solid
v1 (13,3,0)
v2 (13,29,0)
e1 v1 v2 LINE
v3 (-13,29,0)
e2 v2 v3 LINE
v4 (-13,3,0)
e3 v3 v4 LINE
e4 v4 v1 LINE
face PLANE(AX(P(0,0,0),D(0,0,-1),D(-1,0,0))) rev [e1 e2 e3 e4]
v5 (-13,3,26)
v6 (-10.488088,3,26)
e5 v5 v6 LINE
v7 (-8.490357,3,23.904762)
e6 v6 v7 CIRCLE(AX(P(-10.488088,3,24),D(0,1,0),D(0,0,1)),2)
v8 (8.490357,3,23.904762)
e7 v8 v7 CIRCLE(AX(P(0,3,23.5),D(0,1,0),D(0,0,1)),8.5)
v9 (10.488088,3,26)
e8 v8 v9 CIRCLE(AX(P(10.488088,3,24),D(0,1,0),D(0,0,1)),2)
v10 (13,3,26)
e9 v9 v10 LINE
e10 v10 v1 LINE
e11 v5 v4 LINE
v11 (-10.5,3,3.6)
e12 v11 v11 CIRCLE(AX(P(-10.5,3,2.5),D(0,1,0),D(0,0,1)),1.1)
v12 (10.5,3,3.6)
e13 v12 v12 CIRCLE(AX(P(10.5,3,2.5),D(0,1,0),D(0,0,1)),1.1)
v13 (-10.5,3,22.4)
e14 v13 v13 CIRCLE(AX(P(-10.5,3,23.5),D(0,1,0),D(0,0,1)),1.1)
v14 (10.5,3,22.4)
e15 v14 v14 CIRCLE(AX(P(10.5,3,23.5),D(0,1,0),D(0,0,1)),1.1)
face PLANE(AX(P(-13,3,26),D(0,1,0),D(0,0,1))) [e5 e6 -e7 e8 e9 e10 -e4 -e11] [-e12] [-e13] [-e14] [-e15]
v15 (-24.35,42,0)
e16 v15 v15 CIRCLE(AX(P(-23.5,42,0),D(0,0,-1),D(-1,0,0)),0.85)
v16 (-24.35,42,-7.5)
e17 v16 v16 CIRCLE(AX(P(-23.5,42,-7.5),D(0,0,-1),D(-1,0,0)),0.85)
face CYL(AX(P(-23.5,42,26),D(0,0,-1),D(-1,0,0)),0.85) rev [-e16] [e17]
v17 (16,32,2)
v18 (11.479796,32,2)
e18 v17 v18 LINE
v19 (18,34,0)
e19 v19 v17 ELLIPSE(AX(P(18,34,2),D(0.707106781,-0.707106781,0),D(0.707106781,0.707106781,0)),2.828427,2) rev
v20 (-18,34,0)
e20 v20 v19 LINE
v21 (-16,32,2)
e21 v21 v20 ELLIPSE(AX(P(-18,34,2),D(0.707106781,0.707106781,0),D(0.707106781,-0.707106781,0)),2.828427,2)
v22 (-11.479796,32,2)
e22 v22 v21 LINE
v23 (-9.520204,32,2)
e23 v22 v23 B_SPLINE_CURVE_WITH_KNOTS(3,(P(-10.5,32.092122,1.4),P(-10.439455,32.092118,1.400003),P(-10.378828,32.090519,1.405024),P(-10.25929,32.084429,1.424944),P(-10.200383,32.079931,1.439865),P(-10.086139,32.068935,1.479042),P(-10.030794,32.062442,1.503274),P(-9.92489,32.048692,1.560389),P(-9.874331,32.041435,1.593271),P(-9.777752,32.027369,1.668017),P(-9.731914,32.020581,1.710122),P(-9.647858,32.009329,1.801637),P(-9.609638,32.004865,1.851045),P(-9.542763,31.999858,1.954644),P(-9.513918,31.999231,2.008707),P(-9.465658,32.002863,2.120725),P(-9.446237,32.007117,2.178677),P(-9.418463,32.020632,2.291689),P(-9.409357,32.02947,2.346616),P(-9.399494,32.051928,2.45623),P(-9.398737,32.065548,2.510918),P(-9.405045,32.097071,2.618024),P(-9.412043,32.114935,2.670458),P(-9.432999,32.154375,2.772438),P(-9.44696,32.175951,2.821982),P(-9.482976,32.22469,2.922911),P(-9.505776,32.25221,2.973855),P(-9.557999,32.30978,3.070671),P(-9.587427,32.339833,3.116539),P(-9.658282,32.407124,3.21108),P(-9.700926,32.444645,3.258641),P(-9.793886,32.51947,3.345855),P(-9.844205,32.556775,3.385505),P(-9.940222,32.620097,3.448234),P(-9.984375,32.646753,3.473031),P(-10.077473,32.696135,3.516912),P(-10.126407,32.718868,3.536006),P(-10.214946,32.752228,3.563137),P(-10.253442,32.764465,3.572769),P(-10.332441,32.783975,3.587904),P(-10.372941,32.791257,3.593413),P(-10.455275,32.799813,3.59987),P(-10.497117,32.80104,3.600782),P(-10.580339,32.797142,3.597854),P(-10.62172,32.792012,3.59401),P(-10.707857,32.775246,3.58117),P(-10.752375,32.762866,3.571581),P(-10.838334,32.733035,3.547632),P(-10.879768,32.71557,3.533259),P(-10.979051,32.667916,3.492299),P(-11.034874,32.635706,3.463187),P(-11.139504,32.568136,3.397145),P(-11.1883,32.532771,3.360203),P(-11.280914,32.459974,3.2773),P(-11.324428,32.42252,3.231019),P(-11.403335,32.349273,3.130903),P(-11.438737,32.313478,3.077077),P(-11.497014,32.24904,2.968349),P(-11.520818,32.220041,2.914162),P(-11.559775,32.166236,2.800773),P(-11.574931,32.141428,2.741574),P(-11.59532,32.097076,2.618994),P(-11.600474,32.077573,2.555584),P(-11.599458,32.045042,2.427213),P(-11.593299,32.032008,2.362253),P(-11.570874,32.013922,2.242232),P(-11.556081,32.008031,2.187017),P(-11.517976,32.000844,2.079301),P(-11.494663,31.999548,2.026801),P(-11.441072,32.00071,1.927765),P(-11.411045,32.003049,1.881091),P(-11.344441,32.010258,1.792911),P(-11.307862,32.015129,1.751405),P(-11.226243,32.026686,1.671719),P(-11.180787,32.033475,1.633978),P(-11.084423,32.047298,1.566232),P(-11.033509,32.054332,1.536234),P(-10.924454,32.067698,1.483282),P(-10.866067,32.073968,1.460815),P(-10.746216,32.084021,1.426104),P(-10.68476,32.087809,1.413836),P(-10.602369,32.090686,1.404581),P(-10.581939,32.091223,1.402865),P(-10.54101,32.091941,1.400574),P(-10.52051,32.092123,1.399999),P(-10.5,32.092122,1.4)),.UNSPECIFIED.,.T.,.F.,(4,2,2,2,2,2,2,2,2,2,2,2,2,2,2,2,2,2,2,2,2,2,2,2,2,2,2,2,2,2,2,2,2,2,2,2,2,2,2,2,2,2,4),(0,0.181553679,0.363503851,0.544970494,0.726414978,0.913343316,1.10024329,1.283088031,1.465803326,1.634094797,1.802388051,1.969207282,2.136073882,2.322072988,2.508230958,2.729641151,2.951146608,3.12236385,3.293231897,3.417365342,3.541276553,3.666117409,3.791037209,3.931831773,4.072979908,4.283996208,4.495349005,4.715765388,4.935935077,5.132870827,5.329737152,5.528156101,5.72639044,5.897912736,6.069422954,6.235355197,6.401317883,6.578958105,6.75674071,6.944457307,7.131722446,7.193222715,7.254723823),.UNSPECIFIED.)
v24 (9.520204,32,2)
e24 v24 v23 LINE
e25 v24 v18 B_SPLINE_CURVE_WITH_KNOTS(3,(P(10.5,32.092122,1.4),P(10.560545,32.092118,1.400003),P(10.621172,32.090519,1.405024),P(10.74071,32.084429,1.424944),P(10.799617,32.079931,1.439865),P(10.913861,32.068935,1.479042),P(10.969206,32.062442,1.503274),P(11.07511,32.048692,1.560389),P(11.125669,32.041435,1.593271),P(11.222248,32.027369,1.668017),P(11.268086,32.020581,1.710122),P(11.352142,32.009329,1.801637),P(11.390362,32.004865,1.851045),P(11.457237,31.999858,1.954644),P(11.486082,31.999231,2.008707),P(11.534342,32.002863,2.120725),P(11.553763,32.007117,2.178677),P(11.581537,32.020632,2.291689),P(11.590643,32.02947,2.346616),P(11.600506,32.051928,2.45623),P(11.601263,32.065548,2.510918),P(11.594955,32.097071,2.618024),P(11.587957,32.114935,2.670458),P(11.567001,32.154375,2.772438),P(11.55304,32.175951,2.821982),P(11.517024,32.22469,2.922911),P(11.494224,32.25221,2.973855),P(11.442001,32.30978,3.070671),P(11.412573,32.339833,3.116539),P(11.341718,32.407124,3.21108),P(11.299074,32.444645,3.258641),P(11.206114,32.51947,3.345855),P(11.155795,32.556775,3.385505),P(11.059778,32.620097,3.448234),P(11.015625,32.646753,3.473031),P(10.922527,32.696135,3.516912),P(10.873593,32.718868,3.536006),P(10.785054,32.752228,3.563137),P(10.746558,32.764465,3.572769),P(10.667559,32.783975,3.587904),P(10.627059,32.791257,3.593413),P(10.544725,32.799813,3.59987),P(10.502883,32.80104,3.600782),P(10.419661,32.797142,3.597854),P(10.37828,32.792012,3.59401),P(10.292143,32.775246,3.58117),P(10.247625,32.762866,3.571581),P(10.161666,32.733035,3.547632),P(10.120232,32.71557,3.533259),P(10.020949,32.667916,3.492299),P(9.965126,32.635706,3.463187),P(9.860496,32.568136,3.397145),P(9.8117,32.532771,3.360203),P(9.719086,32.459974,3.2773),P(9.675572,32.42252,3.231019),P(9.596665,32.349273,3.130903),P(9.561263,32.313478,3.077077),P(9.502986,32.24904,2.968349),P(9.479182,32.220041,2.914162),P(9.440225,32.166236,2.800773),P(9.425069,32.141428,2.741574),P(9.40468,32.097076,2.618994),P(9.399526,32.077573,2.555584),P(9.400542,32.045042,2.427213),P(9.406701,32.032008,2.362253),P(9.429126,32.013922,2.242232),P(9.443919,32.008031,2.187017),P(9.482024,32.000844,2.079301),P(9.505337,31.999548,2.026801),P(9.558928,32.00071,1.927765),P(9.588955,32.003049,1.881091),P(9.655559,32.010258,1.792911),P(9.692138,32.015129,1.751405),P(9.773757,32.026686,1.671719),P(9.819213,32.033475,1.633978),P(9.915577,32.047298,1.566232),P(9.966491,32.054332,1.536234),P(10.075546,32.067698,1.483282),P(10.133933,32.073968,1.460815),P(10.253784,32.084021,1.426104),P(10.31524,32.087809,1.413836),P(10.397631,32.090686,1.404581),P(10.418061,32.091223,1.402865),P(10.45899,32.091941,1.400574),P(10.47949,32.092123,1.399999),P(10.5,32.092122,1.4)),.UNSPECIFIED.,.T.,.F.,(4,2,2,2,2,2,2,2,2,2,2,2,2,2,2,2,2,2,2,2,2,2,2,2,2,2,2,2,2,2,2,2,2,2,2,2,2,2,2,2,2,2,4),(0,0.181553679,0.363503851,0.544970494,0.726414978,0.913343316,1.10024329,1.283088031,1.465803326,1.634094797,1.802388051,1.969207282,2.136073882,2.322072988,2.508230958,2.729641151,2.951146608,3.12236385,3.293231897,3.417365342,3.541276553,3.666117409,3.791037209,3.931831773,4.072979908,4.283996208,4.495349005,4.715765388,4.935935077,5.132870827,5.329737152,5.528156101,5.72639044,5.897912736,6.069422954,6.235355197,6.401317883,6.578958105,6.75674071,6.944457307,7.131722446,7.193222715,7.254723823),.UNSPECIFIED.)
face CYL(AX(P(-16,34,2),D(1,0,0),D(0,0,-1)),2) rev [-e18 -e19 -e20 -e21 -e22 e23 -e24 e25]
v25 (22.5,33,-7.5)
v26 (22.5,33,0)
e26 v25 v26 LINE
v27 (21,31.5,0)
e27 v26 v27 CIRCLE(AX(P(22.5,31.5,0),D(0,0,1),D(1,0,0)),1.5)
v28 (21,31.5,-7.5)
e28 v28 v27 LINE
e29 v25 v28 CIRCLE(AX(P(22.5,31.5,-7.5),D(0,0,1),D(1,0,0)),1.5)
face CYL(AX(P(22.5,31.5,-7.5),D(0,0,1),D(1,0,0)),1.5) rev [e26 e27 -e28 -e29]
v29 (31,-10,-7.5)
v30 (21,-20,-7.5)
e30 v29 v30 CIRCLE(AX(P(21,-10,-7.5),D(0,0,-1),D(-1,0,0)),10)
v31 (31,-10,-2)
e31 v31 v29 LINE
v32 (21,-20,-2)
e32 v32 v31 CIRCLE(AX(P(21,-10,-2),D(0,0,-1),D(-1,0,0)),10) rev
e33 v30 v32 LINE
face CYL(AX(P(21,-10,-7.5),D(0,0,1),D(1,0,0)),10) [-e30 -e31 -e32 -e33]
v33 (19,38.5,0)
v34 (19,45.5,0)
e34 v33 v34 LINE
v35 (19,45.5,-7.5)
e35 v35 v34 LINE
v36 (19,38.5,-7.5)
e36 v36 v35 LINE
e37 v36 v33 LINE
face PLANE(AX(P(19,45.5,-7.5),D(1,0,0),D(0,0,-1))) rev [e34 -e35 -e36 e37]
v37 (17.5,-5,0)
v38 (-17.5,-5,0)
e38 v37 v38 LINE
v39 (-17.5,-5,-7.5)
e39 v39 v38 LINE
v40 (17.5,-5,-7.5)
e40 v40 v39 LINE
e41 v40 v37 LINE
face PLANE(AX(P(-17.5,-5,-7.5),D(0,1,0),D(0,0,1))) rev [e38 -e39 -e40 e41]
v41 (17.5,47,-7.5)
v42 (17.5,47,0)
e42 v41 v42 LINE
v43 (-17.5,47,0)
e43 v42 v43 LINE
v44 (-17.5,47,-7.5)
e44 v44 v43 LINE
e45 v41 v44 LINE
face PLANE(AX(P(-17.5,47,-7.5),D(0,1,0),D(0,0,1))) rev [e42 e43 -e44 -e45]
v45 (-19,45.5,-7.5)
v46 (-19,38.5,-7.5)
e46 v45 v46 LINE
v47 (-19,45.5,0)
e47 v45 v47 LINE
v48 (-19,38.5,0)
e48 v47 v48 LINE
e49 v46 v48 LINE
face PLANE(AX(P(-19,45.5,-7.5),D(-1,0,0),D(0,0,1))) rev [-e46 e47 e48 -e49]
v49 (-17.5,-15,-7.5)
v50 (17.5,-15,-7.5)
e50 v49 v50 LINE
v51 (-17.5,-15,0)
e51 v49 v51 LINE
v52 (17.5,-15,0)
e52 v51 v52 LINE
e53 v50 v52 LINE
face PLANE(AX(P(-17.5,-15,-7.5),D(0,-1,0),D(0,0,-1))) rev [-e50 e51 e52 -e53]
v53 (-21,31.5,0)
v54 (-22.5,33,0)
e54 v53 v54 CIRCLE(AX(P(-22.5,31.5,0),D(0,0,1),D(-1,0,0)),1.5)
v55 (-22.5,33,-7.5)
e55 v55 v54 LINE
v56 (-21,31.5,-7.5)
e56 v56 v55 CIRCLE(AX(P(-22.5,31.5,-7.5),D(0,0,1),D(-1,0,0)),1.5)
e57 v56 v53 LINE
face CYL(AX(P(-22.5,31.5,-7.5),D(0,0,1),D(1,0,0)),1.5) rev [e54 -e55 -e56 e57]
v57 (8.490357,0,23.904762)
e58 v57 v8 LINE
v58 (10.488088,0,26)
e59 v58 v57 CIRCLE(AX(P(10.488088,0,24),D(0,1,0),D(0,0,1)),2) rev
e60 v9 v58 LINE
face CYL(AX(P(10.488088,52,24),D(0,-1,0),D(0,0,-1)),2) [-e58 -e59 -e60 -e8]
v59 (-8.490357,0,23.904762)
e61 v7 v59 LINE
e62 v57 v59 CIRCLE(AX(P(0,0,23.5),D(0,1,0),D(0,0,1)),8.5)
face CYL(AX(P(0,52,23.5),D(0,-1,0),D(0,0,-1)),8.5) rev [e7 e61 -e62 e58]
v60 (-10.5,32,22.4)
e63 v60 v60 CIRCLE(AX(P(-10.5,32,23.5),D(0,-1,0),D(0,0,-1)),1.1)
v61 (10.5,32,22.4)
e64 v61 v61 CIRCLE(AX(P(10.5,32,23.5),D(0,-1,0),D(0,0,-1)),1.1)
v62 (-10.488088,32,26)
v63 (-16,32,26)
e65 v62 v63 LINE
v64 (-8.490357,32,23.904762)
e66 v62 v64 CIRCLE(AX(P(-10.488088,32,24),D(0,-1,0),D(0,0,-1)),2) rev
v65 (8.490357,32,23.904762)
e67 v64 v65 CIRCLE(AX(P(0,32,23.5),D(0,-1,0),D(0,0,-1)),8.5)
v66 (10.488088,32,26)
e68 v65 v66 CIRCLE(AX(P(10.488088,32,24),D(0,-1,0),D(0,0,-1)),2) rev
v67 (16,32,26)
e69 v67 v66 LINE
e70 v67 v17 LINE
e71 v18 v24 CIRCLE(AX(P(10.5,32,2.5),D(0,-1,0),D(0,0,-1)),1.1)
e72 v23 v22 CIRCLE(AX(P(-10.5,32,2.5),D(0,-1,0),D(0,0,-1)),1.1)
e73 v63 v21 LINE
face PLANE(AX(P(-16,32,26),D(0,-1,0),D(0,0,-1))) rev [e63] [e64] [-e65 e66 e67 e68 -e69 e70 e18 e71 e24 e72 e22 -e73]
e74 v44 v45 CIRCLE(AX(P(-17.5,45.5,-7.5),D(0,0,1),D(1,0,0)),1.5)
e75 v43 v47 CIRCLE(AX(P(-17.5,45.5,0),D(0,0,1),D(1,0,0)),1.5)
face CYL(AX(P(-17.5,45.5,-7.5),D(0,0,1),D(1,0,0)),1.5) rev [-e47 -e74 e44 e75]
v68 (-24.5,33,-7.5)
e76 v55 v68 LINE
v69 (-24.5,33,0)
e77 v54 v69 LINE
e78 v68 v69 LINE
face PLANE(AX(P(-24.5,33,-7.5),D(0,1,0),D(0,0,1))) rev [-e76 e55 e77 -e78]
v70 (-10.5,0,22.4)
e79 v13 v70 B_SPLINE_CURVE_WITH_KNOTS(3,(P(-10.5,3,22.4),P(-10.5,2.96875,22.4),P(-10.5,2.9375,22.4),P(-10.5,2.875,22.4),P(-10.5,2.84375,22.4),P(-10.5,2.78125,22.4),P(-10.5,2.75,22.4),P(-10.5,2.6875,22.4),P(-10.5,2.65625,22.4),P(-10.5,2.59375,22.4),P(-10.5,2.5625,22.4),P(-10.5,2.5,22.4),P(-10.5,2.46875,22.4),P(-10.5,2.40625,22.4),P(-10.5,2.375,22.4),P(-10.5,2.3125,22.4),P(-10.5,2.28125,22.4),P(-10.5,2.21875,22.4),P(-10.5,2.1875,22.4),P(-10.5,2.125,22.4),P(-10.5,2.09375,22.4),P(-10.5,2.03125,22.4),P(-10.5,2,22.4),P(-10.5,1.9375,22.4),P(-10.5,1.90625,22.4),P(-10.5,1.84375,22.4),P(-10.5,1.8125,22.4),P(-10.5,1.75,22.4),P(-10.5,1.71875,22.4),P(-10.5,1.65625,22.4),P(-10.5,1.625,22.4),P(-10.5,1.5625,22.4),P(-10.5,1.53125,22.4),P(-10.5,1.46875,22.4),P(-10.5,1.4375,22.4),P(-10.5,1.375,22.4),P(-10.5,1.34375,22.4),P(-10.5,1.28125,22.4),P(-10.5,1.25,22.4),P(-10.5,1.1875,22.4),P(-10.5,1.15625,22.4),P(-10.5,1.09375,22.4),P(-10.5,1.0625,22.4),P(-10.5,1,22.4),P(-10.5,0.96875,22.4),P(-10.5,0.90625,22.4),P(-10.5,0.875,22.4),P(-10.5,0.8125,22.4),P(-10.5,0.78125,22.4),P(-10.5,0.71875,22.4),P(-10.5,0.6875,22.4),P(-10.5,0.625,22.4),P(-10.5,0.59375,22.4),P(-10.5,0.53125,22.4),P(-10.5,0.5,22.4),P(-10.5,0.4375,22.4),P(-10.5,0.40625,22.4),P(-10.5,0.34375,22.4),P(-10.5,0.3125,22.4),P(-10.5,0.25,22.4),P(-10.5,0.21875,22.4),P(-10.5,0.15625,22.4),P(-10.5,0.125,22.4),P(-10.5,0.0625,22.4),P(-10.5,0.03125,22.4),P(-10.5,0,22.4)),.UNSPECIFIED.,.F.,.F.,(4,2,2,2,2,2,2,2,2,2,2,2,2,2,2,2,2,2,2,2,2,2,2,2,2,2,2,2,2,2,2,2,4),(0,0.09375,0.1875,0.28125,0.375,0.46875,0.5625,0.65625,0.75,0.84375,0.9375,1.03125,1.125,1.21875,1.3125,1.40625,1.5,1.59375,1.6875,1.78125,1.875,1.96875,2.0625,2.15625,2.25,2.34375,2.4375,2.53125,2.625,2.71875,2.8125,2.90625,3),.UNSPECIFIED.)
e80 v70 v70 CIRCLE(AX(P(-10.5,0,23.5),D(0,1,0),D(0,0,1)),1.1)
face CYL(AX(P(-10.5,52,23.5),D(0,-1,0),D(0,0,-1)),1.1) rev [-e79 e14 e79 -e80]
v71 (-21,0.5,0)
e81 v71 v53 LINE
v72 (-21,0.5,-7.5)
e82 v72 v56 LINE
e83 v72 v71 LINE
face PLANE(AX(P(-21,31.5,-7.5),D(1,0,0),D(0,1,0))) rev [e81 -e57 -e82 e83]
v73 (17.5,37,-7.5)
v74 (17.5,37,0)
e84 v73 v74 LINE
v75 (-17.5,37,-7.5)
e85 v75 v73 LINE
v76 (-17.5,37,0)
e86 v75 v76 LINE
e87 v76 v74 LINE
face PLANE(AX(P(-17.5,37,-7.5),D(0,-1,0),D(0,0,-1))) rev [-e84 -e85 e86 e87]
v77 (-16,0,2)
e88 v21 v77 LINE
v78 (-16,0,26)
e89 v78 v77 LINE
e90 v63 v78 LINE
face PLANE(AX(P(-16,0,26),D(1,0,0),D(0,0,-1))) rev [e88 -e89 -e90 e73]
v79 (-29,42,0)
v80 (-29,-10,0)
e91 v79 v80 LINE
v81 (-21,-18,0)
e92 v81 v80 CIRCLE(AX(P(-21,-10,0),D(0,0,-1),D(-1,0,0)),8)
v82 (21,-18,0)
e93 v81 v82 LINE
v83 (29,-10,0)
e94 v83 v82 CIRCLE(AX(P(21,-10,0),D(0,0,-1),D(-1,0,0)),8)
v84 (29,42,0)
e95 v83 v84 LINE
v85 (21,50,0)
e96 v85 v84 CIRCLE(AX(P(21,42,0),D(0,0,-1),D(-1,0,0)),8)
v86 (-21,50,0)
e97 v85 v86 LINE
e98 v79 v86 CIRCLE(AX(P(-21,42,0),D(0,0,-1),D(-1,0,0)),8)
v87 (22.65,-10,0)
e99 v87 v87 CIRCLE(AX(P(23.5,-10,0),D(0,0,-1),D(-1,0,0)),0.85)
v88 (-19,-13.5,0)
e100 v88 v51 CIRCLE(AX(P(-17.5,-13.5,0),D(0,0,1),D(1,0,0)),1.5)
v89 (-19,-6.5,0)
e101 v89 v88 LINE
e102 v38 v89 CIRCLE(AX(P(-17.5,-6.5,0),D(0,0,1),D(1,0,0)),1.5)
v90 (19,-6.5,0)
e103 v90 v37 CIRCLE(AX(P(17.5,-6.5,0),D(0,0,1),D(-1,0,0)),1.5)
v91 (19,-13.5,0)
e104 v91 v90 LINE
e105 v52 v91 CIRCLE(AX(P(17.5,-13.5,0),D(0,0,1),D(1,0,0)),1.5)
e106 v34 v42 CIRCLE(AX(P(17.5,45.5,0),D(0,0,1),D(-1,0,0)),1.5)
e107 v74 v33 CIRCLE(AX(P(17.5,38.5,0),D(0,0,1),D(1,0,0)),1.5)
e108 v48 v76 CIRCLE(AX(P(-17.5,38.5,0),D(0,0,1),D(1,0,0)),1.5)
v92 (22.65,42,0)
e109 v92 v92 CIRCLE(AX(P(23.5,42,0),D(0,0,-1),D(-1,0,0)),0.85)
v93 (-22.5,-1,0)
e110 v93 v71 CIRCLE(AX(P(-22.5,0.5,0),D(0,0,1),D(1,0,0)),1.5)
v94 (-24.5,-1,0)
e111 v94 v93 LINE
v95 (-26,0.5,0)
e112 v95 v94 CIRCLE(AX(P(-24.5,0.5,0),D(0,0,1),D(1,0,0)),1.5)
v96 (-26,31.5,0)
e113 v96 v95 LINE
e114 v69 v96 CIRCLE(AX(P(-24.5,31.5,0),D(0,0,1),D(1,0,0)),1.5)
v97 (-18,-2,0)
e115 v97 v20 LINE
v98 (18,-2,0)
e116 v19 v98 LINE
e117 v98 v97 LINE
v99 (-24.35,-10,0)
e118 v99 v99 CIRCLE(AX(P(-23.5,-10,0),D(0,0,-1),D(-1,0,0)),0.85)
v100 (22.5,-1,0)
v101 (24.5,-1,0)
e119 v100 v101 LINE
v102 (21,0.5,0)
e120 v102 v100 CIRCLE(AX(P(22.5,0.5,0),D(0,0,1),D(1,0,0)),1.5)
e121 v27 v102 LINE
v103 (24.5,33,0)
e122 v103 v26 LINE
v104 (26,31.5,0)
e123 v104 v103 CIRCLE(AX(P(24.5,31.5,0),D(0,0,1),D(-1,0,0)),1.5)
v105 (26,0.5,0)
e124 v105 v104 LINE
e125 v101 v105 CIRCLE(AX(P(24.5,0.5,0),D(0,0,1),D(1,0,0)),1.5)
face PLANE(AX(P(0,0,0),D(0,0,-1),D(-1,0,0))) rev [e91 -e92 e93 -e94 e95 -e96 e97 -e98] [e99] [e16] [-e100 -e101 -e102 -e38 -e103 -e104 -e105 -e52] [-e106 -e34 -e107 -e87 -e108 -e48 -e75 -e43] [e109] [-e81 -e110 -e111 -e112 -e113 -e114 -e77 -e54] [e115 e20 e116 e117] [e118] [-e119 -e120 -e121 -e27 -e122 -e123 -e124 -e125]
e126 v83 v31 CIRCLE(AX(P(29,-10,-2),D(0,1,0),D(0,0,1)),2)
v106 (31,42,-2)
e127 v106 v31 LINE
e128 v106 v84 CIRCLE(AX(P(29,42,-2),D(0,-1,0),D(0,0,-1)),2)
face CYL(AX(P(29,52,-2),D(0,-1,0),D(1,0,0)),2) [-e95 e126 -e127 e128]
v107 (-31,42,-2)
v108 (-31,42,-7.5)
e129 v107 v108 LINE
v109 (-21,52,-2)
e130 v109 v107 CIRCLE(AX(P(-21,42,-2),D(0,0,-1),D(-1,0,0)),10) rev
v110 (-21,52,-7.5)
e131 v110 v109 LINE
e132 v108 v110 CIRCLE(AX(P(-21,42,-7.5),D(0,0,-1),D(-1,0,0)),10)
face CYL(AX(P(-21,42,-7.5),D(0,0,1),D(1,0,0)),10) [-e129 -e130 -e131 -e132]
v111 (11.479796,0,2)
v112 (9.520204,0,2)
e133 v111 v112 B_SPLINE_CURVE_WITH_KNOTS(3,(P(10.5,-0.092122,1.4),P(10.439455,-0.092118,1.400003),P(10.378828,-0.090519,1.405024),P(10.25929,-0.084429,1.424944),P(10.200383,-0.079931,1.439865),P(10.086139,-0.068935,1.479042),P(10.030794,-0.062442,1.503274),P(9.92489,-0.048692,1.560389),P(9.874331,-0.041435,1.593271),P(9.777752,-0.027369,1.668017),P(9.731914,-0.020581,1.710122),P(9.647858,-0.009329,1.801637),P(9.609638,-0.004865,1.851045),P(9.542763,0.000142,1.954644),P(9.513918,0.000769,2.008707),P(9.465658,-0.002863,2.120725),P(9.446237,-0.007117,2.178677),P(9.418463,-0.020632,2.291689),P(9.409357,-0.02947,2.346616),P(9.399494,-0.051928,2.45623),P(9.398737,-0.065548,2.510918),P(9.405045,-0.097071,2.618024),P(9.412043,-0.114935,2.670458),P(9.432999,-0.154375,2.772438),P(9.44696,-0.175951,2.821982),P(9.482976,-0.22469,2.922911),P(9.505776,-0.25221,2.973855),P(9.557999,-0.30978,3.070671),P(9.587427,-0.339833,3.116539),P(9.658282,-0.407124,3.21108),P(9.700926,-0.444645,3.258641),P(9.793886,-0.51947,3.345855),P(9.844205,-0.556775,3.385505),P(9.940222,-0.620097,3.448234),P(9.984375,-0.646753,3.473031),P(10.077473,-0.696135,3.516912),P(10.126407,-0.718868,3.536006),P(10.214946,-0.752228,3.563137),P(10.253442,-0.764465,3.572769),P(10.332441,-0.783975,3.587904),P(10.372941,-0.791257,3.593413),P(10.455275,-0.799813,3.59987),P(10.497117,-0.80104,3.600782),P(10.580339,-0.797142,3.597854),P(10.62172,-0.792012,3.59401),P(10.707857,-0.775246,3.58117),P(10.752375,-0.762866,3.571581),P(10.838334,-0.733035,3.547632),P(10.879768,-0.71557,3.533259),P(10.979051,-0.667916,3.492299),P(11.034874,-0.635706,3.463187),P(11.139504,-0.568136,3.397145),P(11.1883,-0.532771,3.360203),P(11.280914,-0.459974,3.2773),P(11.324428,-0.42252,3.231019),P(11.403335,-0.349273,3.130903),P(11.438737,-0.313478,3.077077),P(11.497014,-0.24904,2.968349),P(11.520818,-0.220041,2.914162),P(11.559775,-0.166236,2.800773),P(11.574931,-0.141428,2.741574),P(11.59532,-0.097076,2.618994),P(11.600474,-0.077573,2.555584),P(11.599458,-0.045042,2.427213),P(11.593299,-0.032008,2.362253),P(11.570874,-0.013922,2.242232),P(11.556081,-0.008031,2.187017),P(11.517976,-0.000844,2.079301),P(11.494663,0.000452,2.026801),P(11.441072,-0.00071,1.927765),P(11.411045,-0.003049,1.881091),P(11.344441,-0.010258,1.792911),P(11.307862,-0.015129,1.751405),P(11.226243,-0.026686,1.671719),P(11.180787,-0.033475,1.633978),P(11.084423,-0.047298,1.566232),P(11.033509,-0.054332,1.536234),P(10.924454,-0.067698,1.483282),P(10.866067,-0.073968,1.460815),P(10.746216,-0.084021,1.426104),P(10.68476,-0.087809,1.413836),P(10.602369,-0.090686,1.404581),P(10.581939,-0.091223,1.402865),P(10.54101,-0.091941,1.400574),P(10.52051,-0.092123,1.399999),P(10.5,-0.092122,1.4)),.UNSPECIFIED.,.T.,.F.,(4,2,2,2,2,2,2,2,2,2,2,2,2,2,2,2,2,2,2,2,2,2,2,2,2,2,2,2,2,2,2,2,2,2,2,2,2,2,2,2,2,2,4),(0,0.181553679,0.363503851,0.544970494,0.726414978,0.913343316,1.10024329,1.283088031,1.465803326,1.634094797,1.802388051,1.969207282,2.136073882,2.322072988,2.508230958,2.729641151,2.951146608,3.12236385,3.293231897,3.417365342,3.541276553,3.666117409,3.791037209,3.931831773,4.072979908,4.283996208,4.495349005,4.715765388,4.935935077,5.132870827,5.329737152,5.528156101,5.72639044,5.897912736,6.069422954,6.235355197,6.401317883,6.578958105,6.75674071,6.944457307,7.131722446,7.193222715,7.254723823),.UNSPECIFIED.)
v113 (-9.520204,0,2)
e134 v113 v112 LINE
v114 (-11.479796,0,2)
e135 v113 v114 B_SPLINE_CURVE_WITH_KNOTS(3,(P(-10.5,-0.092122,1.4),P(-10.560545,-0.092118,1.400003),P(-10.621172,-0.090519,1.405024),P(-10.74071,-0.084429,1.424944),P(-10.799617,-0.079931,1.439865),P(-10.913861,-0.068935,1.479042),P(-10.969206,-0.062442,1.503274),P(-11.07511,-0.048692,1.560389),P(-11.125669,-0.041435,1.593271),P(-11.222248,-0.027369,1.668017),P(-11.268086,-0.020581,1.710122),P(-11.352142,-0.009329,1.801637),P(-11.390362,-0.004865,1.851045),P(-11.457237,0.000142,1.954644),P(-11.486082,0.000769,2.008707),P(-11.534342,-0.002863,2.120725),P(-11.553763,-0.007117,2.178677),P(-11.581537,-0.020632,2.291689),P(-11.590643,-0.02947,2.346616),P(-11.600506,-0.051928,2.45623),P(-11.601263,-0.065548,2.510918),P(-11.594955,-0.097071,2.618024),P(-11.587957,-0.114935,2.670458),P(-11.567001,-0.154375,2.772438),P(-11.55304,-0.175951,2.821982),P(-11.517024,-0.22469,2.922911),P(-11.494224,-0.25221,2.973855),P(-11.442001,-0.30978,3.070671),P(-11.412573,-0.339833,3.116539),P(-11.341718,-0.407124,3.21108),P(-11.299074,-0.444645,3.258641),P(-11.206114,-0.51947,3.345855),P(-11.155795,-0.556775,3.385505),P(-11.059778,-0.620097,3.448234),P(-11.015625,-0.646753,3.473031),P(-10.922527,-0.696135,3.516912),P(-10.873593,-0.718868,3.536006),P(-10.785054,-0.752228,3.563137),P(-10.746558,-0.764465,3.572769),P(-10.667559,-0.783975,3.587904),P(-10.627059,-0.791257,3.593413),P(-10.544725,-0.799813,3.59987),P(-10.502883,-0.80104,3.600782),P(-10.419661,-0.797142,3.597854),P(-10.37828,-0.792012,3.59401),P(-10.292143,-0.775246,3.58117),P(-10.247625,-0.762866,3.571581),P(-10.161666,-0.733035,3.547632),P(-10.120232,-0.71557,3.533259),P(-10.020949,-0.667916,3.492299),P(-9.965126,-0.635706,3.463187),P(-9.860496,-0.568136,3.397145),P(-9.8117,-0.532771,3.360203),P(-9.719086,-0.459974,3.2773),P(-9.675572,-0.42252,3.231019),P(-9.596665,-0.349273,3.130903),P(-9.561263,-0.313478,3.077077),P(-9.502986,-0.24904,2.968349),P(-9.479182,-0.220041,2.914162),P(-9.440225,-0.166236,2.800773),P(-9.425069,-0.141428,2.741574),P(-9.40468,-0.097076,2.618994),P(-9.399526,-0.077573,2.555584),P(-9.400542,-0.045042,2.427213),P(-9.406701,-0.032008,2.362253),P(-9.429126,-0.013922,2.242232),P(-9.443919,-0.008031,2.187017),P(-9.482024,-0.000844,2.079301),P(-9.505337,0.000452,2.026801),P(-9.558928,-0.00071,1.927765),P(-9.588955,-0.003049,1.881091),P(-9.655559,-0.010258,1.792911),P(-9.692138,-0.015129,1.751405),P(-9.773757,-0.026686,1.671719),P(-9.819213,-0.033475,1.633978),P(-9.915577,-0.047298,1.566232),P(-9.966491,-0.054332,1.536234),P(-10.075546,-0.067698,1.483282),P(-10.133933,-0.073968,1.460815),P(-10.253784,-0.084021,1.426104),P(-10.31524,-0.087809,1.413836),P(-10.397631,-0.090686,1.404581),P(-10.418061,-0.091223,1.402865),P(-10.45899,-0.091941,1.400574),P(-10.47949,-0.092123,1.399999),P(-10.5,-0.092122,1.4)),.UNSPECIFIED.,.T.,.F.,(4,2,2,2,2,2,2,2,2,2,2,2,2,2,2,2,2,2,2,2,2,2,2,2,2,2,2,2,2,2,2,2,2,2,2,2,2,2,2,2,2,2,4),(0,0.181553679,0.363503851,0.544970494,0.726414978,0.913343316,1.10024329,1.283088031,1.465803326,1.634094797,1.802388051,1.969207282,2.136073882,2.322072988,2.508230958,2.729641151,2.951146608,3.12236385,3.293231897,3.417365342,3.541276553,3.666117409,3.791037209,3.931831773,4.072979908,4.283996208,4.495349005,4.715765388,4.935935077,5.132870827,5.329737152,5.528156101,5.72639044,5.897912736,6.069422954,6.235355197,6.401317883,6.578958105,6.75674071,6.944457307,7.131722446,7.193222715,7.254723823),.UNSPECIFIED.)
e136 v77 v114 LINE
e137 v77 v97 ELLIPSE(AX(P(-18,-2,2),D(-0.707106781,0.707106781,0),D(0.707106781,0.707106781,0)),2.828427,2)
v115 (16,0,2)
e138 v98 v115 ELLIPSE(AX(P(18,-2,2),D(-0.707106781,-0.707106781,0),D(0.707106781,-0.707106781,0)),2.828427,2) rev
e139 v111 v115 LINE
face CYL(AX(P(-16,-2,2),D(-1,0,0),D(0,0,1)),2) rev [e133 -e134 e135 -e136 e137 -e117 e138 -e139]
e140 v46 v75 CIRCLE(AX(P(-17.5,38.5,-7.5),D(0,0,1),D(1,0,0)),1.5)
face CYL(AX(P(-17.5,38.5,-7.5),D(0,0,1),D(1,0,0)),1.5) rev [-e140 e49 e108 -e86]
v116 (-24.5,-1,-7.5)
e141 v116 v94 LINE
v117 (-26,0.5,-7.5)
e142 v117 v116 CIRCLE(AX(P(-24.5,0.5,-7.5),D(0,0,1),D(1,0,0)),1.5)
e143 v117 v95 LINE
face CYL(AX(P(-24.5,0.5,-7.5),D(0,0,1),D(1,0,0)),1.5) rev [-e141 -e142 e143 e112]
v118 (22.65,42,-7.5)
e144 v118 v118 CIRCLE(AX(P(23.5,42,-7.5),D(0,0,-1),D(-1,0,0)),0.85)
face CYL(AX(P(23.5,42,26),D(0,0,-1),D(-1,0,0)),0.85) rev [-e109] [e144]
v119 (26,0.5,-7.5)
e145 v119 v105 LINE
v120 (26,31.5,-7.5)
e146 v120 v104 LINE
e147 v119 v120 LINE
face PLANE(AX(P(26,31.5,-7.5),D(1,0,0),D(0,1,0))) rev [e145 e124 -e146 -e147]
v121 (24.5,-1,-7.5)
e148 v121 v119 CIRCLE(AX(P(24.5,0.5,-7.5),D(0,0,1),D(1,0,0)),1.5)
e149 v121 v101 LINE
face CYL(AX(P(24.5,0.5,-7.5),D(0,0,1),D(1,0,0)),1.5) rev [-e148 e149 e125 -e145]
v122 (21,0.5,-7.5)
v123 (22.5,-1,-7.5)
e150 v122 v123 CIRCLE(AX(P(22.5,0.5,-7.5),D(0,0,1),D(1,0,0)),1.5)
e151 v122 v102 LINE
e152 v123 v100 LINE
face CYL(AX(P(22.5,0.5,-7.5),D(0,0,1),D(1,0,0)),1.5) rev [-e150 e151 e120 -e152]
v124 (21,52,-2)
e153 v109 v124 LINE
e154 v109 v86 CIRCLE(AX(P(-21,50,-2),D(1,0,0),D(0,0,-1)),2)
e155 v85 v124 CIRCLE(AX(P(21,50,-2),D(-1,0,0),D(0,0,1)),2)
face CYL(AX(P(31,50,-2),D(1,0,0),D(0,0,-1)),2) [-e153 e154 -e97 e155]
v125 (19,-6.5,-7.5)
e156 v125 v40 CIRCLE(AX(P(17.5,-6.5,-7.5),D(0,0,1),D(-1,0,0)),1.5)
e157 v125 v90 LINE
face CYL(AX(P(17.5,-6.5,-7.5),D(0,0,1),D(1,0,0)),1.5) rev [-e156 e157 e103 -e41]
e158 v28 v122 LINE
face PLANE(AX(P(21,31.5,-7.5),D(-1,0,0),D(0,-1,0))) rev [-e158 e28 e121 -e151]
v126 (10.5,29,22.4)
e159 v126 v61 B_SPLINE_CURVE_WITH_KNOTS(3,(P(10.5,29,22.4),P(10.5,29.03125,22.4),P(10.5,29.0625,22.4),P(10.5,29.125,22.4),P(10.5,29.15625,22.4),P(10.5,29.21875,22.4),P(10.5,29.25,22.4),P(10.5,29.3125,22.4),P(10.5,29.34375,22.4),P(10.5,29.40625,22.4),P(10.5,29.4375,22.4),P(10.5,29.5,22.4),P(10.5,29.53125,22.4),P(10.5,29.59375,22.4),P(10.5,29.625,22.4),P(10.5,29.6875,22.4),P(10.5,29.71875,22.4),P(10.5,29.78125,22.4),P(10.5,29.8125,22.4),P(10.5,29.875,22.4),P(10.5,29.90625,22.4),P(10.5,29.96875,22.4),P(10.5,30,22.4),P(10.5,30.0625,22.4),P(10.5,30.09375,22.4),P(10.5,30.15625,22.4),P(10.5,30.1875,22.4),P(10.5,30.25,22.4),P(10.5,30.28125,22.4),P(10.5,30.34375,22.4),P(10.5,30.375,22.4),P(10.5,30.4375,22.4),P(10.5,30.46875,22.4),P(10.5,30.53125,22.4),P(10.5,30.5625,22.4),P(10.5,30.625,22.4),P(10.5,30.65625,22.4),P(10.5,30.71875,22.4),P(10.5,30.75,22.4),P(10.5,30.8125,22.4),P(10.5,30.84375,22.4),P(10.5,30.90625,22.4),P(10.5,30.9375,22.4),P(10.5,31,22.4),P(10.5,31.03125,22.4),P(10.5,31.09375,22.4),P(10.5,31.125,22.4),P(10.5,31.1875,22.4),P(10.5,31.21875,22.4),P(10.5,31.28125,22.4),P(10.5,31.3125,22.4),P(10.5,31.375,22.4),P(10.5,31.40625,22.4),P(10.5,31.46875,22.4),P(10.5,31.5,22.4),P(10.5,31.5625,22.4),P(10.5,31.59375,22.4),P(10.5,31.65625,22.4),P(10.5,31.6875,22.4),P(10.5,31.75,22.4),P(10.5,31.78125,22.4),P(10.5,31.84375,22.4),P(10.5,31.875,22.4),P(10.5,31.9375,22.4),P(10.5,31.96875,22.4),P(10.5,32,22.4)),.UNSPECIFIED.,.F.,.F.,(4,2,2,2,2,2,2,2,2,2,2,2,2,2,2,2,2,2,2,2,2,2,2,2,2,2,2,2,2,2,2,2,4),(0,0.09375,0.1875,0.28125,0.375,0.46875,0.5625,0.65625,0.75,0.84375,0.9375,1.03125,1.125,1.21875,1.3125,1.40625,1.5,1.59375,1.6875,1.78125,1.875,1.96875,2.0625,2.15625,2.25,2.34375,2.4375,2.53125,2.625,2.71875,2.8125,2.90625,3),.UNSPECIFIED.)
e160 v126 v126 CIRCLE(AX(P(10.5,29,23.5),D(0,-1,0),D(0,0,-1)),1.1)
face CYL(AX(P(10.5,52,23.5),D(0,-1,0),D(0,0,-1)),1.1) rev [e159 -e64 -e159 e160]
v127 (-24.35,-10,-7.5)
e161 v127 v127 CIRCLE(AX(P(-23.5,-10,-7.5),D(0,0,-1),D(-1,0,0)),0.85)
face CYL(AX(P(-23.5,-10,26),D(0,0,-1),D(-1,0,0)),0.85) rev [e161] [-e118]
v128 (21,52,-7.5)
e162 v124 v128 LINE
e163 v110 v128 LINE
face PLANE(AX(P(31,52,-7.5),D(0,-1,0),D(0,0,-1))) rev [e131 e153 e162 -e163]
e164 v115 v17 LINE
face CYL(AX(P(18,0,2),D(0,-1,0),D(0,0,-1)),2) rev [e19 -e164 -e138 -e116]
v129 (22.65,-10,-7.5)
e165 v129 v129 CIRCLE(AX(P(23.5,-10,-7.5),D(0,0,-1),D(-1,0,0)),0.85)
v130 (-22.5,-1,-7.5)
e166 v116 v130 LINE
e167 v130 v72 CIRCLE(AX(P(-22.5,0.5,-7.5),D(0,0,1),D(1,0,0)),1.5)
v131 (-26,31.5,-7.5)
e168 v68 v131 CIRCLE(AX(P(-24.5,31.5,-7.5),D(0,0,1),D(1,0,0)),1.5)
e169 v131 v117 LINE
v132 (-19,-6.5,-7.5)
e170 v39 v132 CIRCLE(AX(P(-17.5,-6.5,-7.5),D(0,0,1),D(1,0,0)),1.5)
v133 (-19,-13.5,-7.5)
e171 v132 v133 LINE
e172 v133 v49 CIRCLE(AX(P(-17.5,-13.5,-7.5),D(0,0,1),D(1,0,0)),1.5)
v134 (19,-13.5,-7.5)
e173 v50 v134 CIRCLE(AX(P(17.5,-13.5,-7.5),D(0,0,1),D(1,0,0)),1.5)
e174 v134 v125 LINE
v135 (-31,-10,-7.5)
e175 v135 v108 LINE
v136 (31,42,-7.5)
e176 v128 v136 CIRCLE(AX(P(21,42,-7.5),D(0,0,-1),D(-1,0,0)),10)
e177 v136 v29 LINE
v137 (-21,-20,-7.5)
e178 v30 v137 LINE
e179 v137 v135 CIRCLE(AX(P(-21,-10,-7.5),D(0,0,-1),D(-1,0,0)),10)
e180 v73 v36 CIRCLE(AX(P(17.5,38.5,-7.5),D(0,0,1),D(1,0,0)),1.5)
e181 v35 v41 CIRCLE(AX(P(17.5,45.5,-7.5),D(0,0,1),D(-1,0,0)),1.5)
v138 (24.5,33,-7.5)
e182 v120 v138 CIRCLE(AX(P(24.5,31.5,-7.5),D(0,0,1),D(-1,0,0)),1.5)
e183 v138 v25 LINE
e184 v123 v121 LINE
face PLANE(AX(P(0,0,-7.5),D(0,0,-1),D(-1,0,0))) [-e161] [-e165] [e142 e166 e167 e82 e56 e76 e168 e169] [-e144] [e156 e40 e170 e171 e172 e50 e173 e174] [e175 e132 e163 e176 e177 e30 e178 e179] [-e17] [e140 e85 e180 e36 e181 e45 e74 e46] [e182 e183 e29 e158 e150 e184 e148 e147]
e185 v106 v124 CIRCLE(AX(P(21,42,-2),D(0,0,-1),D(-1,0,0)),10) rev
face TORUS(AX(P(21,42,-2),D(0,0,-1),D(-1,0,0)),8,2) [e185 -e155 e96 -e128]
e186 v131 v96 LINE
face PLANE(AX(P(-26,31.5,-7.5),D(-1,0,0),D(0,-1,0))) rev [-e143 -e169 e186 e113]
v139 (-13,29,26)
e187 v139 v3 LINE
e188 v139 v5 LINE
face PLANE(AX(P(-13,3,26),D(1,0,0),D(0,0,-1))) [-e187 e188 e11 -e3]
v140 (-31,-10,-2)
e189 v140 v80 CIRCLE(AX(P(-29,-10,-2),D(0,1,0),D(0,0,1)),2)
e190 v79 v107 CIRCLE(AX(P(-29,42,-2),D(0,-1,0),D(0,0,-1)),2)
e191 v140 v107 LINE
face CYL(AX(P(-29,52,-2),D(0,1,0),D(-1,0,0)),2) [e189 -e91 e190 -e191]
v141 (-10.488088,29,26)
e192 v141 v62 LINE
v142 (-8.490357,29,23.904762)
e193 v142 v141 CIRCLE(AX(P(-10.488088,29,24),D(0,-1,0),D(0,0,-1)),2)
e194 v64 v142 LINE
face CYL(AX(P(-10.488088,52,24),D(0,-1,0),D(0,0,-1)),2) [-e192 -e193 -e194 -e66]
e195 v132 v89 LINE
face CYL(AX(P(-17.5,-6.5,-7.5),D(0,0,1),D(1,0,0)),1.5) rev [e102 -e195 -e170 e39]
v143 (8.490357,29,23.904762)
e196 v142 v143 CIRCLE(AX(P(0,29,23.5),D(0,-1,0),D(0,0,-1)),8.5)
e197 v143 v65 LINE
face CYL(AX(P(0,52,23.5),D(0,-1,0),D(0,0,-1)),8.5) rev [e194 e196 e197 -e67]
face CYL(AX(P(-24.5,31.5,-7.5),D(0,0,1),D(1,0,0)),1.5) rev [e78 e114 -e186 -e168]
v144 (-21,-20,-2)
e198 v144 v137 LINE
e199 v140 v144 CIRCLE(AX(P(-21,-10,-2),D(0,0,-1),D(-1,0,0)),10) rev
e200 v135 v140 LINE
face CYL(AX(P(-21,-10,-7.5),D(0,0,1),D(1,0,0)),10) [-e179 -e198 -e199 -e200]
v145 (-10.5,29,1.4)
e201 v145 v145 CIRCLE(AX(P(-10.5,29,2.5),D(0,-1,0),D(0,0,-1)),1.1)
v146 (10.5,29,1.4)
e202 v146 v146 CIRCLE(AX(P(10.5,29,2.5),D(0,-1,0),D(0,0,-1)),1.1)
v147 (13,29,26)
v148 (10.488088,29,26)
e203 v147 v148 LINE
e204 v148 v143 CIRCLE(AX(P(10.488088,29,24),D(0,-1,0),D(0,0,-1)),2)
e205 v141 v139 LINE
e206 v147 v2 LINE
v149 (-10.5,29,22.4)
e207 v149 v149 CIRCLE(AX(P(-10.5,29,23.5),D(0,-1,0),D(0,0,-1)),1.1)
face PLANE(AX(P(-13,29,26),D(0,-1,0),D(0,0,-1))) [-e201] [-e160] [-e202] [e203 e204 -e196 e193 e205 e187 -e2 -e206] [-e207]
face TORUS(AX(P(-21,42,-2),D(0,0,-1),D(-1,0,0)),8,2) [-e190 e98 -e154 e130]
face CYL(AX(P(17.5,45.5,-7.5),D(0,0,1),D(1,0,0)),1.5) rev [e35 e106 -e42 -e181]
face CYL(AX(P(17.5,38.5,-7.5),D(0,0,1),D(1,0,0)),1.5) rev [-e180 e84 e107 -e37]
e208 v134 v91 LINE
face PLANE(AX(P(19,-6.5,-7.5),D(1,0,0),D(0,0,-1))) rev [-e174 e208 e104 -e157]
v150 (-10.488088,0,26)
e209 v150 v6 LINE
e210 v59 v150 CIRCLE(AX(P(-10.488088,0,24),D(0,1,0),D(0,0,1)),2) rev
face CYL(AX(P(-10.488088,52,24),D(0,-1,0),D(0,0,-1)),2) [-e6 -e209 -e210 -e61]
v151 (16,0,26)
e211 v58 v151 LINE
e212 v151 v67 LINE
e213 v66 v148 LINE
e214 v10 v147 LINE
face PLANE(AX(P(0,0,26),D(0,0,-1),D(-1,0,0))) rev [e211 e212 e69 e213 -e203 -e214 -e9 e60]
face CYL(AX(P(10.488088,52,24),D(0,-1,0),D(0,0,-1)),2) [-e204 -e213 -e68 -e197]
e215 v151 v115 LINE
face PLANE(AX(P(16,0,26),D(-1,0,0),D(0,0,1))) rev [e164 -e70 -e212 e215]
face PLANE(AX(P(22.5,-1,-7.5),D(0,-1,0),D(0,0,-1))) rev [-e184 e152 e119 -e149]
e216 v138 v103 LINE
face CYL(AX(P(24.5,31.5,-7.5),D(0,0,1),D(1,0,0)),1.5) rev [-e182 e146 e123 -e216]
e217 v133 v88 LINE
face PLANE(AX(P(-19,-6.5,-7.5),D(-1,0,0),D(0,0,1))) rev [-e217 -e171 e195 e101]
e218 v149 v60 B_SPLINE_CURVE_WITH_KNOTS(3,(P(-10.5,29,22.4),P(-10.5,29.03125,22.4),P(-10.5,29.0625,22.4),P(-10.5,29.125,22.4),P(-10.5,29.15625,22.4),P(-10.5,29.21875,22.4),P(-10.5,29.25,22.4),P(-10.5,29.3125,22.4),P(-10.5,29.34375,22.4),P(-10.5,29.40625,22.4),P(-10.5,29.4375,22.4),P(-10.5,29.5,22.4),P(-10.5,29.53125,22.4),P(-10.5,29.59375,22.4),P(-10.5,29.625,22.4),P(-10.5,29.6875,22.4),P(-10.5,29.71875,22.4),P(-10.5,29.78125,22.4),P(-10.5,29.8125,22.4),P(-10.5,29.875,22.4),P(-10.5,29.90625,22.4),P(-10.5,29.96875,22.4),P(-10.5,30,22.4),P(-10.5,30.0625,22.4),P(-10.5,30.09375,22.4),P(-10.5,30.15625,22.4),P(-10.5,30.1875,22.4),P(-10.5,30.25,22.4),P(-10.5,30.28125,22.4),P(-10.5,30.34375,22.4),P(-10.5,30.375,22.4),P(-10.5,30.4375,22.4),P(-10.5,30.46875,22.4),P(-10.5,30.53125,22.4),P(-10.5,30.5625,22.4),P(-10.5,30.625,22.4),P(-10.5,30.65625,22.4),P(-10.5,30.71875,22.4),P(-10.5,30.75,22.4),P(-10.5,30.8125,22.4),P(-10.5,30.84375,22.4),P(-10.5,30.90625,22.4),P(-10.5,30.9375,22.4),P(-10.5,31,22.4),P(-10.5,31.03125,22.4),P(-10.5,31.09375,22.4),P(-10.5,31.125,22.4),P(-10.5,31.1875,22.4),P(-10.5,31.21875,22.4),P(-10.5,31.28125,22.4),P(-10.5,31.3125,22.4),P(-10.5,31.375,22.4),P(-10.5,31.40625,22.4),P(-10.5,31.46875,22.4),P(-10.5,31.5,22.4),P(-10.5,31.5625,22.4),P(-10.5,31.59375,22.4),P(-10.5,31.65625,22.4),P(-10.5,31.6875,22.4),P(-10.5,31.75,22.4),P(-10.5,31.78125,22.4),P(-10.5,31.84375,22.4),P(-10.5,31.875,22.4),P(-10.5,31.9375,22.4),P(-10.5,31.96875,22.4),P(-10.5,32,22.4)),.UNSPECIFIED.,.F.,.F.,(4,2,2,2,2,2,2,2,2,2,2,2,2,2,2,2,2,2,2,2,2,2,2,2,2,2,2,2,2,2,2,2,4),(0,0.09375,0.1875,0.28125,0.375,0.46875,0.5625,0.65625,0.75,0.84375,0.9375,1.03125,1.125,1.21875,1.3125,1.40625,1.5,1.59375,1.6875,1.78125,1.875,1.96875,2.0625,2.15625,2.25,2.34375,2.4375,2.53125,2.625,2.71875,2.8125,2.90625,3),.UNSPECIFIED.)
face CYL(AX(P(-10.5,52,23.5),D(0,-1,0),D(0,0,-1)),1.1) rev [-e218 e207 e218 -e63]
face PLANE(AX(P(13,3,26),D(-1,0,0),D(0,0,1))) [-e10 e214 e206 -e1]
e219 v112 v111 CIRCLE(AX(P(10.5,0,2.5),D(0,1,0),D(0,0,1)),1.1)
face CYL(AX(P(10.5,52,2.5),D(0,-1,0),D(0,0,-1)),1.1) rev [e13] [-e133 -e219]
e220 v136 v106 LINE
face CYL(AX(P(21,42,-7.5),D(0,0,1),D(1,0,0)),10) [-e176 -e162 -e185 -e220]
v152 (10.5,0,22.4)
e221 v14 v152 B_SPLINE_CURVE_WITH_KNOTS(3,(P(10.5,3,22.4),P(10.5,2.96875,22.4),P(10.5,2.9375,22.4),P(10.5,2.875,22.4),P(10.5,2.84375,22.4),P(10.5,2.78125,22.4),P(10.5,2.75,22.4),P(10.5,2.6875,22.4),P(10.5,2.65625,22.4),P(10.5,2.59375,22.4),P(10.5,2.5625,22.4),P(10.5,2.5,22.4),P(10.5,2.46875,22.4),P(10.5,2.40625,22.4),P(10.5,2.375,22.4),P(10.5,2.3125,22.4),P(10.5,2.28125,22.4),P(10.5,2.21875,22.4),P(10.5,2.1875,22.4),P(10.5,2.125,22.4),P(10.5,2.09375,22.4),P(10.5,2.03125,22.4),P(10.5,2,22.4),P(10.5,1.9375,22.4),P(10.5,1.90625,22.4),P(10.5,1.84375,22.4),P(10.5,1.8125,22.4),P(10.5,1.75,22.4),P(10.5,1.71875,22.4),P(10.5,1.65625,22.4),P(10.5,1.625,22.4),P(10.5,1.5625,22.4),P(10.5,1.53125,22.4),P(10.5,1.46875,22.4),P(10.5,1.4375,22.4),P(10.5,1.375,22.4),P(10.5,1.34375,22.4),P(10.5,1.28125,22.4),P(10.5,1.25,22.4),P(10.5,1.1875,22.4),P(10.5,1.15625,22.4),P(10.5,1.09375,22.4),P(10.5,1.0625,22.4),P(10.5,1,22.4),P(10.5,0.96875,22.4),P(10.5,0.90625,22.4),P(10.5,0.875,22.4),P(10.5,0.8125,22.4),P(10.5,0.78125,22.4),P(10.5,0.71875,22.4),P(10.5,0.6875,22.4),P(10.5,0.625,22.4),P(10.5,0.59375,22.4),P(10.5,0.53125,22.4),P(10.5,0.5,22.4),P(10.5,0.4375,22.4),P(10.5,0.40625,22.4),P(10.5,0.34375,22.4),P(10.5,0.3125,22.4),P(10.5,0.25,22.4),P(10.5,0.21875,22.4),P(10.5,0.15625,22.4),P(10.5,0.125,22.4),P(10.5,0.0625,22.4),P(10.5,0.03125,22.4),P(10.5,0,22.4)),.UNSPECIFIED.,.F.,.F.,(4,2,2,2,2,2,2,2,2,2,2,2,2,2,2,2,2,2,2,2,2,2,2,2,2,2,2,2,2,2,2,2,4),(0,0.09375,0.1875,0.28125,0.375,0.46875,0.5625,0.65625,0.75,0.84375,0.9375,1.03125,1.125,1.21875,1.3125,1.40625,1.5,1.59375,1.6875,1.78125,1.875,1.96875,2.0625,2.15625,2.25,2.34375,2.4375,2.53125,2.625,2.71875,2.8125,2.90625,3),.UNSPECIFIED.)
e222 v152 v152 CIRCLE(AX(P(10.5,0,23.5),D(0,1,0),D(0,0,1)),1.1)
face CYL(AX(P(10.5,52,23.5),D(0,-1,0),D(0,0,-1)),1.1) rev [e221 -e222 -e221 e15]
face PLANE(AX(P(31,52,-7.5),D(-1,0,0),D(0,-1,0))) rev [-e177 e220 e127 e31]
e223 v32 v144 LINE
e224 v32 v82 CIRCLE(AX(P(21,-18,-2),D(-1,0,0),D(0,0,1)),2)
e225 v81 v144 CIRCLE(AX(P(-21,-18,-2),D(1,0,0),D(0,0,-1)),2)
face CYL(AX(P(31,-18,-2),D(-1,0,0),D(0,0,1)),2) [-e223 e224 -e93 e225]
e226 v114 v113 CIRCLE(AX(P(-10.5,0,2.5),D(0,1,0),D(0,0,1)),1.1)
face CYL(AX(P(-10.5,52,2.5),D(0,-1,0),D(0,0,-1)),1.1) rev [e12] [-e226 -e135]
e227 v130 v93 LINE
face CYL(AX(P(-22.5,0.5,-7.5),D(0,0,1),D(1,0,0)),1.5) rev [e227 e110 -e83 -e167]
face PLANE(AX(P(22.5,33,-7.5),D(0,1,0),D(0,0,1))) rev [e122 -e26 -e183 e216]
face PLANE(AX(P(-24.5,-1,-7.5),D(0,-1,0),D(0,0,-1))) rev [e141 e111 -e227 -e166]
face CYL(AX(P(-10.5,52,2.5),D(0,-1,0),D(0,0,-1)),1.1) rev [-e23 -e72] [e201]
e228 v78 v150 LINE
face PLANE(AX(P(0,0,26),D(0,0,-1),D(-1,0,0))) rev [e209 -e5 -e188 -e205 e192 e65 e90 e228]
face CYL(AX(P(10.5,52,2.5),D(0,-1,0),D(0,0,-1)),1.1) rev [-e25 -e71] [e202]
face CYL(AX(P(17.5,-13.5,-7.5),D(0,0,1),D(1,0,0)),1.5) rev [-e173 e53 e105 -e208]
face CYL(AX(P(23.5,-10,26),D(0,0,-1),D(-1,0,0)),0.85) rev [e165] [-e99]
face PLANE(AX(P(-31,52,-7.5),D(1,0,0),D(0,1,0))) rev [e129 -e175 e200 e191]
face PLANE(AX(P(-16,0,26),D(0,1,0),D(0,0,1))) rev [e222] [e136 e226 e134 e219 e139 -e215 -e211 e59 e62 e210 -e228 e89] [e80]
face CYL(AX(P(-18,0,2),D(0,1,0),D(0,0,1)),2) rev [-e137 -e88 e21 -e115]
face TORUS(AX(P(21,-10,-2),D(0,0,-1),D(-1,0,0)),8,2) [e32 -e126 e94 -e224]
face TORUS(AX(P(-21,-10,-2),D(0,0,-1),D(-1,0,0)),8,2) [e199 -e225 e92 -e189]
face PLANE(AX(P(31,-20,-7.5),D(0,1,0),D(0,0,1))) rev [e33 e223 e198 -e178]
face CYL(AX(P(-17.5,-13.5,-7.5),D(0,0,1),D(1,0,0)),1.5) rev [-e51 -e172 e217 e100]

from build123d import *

# Parameters (mm, degrees)
SKETCH_2_W               = 32
SKETCH_2_H               = 32
SKETCH_2_W_2             = 26
SKETCH_2_H_2             = 26
EXTRUDE_1_DEPTH          = 26
SKETCH_3_W               = 62
SKETCH_3_H               = 72
EXTRUDE_2_DEPTH          = 7.5
FILLET_1_R               = 2
FILLET_2_R               = 2
CUT_EXTRUDE_1_DEPTH      = 66.88626564
CUT_EXTRUDE_1_DEPTH_BACK = 66.88626564
SKETCH_5_R               = 1.1
SKETCH_5_R_2             = 8.5
FILLET_3_R               = 2
SKETCH_7_R               = 0.85
CUT_EXTRUDE_2_DEPTH      = 70.189955918
FILLET_4_R               = 10
CUT_EXTRUDE_3_DEPTH      = 66.88626564


with BuildPart() as part:
    # ｽｹｯﾁ2 → ﾎﾞｽ - 押し出し1 (new body)
    with BuildSketch(Plane.XY):
        with Locations((0, 16)):
            Rectangle(SKETCH_2_W, SKETCH_2_H)
        with Locations((0, 16)):
            Rectangle(SKETCH_2_W_2, SKETCH_2_H_2, mode=Mode.SUBTRACT)
    extrude(amount=EXTRUDE_1_DEPTH)

    # ｽｹｯﾁ3 → ﾎﾞｽ - 押し出し2 (add)
    with BuildSketch(Plane(origin=(0, 0, 0), x_dir=(-1, 0, 0), z_dir=(0, 0, -1))):
        with Locations((0, 16)):
            Rectangle(SKETCH_3_W, SKETCH_3_H)
    extrude(amount=EXTRUDE_2_DEPTH)

    # ﾌｨﾚｯﾄ1
    fillet_1_edges = [part.edges().sort_by_distance(p)[0] for p in [
        (0, 32, 0),
        (16, 16, 0),
        (0, 0, 0),
        (-16, 16, 0),
    ]]
    fillet(fillet_1_edges, radius=FILLET_1_R)

    # ﾌｨﾚｯﾄ2
    fillet_2_edges = [part.edges().sort_by_distance(p)[0] for p in [
        (31, 16, 0),
        (0, -20, 0),
        (-31, 16, 0),
        (0, 52, 0),
    ]]
    fillet(fillet_2_edges, radius=FILLET_2_R)

    # ｽｹｯﾁ5 → ｶｯﾄ - 押し出し1 (cut, two sides: drawn at the far end of the back side and taken through both)
    with BuildSketch(Plane.XZ.offset(-CUT_EXTRUDE_1_DEPTH_BACK)):
        with Locations(Location((10.5, 23.5, 0), (0, 0, 270))):
            Circle(SKETCH_5_R)
        with Locations(Location((-10.5, 23.5, 0), (0, 0, 270))):
            Circle(SKETCH_5_R)
        with Locations(Location((-10.5, 2.5, 0), (0, 0, 332.964308211))):
            Circle(SKETCH_5_R)
        with Locations(Location((10.5, 2.5, 0), (0, 0, 332.964308211))):
            Circle(SKETCH_5_R)
        with Locations((0, 23.5)):
            Circle(SKETCH_5_R_2)
    extrude(amount=CUT_EXTRUDE_1_DEPTH + CUT_EXTRUDE_1_DEPTH_BACK, mode=Mode.SUBTRACT)

    # ﾌｨﾚｯﾄ3
    fillet_3_edges = [part.edges().sort_by_distance(p)[0] for p in [
        (8.124038405, 1.5, 26),
        (-8.124038405, 1.5, 26),
        (-8.124038405, 30.5, 26),
        (8.124038405, 30.5, 26),
    ]]
    fillet(fillet_3_edges, radius=FILLET_3_R)

    # ｽｹｯﾁ7 → ｶｯﾄ - 押し出し2 (cut, through all)
    with BuildSketch(Plane(origin=(0, 0, -7.5), x_dir=(-1, 0, 0), z_dir=(0, 0, -1))):
        with Locations((-23.5, -10)):
            Circle(SKETCH_7_R)
        with Locations((-23.5, 42)):
            Circle(SKETCH_7_R)
        with Locations((23.5, 42)):
            Circle(SKETCH_7_R)
        with Locations((23.5, -10)):
            Circle(SKETCH_7_R)
    extrude(amount=-CUT_EXTRUDE_2_DEPTH, mode=Mode.SUBTRACT)

    # ﾌｨﾚｯﾄ4
    # the kernel refuses this fillet: 10 mm, written as the material it takes off along each edge
    with BuildSketch(Plane(origin=(21, -10, 0), x_dir=(0, -1, 0), z_dir=(-1, 0, 0))) as fillet_4_piece_1:
        with BuildLine():
            CenterArc((8, -2), 2, 0, 90)
            Line((10, -2), (10, 0))
            Line((10, 0), (8, 0))
        make_face()
    revolve(axis=Axis((21, -10, 0), (0, 0, 1)), revolution_arc=90, mode=Mode.SUBTRACT)
    with BuildSketch(Plane(origin=(21, 42, 0), x_dir=(1, 0, 0), z_dir=(0, -1, 0))) as fillet_4_piece_2:
        with BuildLine():
            CenterArc((8, -2), 2, 0, 90)
            Line((10, -2), (10, 0))
            Line((10, 0), (8, 0))
        make_face()
    revolve(axis=Axis((21, 42, 0), (0, 0, 1)), revolution_arc=90, mode=Mode.SUBTRACT)
    with BuildSketch(Plane(origin=(-21, -10, 0), x_dir=(-1, 0, 0), z_dir=(0, 1, 0))) as fillet_4_piece_3:
        with BuildLine():
            CenterArc((8, -2), 2, 0, 90)
            Line((10, -2), (10, 0))
            Line((10, 0), (8, 0))
        make_face()
    revolve(axis=Axis((-21, -10, 0), (0, 0, 1)), revolution_arc=90, mode=Mode.SUBTRACT)
    with BuildSketch(Plane(origin=(-21, 42, 0), x_dir=(0, 1, 0), z_dir=(1, 0, 0))) as fillet_4_piece_4:
        with BuildLine():
            CenterArc((8, -2), 2, 0, 90)
            Line((10, -2), (10, 0))
            Line((10, 0), (8, 0))
        make_face()
    revolve(axis=Axis((-21, 42, 0), (0, 0, 1)), revolution_arc=90, mode=Mode.SUBTRACT)
    with BuildSketch(Plane(origin=(31, 52, 0), x_dir=(0, -1, 0), z_dir=(0, 0, -1)), Plane(origin=(-31, 52, 0), x_dir=(1, 0, 0), z_dir=(0, 0, -1))) as fillet_4_piece_5:
        with BuildLine():
            CenterArc((FILLET_4_R, FILLET_4_R), FILLET_4_R, 180, 90)
            Line((0, FILLET_4_R), (0, 0))
            Line((0, 0), (FILLET_4_R, 0))
        make_face()
    extrude(amount=32.5, mode=Mode.SUBTRACT)
    with BuildSketch(Plane(origin=(31, -20, 0), x_dir=(0, 1, 0), z_dir=(0, 0, -1)), Plane(origin=(-31, -20, 0), x_dir=(1, 0, 0), z_dir=(0, 0, -1))) as fillet_4_piece_6:
        with BuildLine():
            CenterArc((FILLET_4_R, -FILLET_4_R), FILLET_4_R, 90, 90)
            Line((0, -FILLET_4_R), (0, 0))
            Line((0, 0), (FILLET_4_R, 0))
        make_face()
    extrude(amount=32.5, mode=Mode.SUBTRACT)

    # ｽｹｯﾁ8 → ｶｯﾄ - 押し出し3 (cut, through all)
    with BuildSketch(Plane.XY):
        with BuildLine():
            Line((-17.5, 47), (17.5, 47))
            ThreePointArc((17.5, 47), (18.560660172, 46.560660172), (19, 45.5))
            Line((19, 45.5), (19, 38.5))
            ThreePointArc((19, 38.5), (18.560660172, 37.439339828), (17.5, 37))
            Line((17.5, 37), (-17.5, 37))
            ThreePointArc((-17.5, 37), (-18.560660172, 37.439339828), (-19, 38.5))
            Line((-19, 38.5), (-19, 45.5))
            ThreePointArc((-19, 45.5), (-18.560660172, 46.560660172), (-17.5, 47))
        make_face()
        with BuildLine():
            Line((22.5, 33), (24.5, 33))
            ThreePointArc((24.5, 33), (25.560660172, 32.560660172), (26, 31.5))
            Line((26, 31.5), (26, 0.5))
            ThreePointArc((26, 0.5), (25.560660172, -0.560660172), (24.5, -1))
            Line((24.5, -1), (22.5, -1))
            ThreePointArc((22.5, -1), (21.439339828, -0.560660172), (21, 0.5))
            Line((21, 0.5), (21, 31.5))
            ThreePointArc((21, 31.5), (21.439339828, 32.560660172), (22.5, 33))
        make_face()
        with BuildLine():
            Line((-24.5, 33), (-22.5, 33))
            ThreePointArc((-22.5, 33), (-21.439339828, 32.560660172), (-21, 31.5))
            Line((-21, 31.5), (-21, 0.5))
            ThreePointArc((-21, 0.5), (-21.439339828, -0.560660172), (-22.5, -1))
            Line((-22.5, -1), (-24.5, -1))
            ThreePointArc((-24.5, -1), (-25.560660172, -0.560660172), (-26, 0.5))
            Line((-26, 0.5), (-26, 31.5))
            ThreePointArc((-26, 31.5), (-25.560660172, 32.560660172), (-24.5, 33))
        make_face()
        with BuildLine():
            Line((-17.5, -5), (17.5, -5))
            ThreePointArc((17.5, -5), (18.560660172, -5.439339828), (19, -6.5))
            Line((19, -6.5), (19, -13.5))
            ThreePointArc((19, -13.5), (18.560660172, -14.560660172), (17.5, -15))
            Line((17.5, -15), (-17.5, -15))
            ThreePointArc((-17.5, -15), (-18.560660172, -14.560660172), (-19, -13.5))
            Line((-19, -13.5), (-19, -6.5))
            ThreePointArc((-19, -6.5), (-18.560660172, -5.439339828), (-17.5, -5))
        make_face()
    extrude(amount=-CUT_EXTRUDE_3_DEPTH, mode=Mode.SUBTRACT)


solid = part.part
